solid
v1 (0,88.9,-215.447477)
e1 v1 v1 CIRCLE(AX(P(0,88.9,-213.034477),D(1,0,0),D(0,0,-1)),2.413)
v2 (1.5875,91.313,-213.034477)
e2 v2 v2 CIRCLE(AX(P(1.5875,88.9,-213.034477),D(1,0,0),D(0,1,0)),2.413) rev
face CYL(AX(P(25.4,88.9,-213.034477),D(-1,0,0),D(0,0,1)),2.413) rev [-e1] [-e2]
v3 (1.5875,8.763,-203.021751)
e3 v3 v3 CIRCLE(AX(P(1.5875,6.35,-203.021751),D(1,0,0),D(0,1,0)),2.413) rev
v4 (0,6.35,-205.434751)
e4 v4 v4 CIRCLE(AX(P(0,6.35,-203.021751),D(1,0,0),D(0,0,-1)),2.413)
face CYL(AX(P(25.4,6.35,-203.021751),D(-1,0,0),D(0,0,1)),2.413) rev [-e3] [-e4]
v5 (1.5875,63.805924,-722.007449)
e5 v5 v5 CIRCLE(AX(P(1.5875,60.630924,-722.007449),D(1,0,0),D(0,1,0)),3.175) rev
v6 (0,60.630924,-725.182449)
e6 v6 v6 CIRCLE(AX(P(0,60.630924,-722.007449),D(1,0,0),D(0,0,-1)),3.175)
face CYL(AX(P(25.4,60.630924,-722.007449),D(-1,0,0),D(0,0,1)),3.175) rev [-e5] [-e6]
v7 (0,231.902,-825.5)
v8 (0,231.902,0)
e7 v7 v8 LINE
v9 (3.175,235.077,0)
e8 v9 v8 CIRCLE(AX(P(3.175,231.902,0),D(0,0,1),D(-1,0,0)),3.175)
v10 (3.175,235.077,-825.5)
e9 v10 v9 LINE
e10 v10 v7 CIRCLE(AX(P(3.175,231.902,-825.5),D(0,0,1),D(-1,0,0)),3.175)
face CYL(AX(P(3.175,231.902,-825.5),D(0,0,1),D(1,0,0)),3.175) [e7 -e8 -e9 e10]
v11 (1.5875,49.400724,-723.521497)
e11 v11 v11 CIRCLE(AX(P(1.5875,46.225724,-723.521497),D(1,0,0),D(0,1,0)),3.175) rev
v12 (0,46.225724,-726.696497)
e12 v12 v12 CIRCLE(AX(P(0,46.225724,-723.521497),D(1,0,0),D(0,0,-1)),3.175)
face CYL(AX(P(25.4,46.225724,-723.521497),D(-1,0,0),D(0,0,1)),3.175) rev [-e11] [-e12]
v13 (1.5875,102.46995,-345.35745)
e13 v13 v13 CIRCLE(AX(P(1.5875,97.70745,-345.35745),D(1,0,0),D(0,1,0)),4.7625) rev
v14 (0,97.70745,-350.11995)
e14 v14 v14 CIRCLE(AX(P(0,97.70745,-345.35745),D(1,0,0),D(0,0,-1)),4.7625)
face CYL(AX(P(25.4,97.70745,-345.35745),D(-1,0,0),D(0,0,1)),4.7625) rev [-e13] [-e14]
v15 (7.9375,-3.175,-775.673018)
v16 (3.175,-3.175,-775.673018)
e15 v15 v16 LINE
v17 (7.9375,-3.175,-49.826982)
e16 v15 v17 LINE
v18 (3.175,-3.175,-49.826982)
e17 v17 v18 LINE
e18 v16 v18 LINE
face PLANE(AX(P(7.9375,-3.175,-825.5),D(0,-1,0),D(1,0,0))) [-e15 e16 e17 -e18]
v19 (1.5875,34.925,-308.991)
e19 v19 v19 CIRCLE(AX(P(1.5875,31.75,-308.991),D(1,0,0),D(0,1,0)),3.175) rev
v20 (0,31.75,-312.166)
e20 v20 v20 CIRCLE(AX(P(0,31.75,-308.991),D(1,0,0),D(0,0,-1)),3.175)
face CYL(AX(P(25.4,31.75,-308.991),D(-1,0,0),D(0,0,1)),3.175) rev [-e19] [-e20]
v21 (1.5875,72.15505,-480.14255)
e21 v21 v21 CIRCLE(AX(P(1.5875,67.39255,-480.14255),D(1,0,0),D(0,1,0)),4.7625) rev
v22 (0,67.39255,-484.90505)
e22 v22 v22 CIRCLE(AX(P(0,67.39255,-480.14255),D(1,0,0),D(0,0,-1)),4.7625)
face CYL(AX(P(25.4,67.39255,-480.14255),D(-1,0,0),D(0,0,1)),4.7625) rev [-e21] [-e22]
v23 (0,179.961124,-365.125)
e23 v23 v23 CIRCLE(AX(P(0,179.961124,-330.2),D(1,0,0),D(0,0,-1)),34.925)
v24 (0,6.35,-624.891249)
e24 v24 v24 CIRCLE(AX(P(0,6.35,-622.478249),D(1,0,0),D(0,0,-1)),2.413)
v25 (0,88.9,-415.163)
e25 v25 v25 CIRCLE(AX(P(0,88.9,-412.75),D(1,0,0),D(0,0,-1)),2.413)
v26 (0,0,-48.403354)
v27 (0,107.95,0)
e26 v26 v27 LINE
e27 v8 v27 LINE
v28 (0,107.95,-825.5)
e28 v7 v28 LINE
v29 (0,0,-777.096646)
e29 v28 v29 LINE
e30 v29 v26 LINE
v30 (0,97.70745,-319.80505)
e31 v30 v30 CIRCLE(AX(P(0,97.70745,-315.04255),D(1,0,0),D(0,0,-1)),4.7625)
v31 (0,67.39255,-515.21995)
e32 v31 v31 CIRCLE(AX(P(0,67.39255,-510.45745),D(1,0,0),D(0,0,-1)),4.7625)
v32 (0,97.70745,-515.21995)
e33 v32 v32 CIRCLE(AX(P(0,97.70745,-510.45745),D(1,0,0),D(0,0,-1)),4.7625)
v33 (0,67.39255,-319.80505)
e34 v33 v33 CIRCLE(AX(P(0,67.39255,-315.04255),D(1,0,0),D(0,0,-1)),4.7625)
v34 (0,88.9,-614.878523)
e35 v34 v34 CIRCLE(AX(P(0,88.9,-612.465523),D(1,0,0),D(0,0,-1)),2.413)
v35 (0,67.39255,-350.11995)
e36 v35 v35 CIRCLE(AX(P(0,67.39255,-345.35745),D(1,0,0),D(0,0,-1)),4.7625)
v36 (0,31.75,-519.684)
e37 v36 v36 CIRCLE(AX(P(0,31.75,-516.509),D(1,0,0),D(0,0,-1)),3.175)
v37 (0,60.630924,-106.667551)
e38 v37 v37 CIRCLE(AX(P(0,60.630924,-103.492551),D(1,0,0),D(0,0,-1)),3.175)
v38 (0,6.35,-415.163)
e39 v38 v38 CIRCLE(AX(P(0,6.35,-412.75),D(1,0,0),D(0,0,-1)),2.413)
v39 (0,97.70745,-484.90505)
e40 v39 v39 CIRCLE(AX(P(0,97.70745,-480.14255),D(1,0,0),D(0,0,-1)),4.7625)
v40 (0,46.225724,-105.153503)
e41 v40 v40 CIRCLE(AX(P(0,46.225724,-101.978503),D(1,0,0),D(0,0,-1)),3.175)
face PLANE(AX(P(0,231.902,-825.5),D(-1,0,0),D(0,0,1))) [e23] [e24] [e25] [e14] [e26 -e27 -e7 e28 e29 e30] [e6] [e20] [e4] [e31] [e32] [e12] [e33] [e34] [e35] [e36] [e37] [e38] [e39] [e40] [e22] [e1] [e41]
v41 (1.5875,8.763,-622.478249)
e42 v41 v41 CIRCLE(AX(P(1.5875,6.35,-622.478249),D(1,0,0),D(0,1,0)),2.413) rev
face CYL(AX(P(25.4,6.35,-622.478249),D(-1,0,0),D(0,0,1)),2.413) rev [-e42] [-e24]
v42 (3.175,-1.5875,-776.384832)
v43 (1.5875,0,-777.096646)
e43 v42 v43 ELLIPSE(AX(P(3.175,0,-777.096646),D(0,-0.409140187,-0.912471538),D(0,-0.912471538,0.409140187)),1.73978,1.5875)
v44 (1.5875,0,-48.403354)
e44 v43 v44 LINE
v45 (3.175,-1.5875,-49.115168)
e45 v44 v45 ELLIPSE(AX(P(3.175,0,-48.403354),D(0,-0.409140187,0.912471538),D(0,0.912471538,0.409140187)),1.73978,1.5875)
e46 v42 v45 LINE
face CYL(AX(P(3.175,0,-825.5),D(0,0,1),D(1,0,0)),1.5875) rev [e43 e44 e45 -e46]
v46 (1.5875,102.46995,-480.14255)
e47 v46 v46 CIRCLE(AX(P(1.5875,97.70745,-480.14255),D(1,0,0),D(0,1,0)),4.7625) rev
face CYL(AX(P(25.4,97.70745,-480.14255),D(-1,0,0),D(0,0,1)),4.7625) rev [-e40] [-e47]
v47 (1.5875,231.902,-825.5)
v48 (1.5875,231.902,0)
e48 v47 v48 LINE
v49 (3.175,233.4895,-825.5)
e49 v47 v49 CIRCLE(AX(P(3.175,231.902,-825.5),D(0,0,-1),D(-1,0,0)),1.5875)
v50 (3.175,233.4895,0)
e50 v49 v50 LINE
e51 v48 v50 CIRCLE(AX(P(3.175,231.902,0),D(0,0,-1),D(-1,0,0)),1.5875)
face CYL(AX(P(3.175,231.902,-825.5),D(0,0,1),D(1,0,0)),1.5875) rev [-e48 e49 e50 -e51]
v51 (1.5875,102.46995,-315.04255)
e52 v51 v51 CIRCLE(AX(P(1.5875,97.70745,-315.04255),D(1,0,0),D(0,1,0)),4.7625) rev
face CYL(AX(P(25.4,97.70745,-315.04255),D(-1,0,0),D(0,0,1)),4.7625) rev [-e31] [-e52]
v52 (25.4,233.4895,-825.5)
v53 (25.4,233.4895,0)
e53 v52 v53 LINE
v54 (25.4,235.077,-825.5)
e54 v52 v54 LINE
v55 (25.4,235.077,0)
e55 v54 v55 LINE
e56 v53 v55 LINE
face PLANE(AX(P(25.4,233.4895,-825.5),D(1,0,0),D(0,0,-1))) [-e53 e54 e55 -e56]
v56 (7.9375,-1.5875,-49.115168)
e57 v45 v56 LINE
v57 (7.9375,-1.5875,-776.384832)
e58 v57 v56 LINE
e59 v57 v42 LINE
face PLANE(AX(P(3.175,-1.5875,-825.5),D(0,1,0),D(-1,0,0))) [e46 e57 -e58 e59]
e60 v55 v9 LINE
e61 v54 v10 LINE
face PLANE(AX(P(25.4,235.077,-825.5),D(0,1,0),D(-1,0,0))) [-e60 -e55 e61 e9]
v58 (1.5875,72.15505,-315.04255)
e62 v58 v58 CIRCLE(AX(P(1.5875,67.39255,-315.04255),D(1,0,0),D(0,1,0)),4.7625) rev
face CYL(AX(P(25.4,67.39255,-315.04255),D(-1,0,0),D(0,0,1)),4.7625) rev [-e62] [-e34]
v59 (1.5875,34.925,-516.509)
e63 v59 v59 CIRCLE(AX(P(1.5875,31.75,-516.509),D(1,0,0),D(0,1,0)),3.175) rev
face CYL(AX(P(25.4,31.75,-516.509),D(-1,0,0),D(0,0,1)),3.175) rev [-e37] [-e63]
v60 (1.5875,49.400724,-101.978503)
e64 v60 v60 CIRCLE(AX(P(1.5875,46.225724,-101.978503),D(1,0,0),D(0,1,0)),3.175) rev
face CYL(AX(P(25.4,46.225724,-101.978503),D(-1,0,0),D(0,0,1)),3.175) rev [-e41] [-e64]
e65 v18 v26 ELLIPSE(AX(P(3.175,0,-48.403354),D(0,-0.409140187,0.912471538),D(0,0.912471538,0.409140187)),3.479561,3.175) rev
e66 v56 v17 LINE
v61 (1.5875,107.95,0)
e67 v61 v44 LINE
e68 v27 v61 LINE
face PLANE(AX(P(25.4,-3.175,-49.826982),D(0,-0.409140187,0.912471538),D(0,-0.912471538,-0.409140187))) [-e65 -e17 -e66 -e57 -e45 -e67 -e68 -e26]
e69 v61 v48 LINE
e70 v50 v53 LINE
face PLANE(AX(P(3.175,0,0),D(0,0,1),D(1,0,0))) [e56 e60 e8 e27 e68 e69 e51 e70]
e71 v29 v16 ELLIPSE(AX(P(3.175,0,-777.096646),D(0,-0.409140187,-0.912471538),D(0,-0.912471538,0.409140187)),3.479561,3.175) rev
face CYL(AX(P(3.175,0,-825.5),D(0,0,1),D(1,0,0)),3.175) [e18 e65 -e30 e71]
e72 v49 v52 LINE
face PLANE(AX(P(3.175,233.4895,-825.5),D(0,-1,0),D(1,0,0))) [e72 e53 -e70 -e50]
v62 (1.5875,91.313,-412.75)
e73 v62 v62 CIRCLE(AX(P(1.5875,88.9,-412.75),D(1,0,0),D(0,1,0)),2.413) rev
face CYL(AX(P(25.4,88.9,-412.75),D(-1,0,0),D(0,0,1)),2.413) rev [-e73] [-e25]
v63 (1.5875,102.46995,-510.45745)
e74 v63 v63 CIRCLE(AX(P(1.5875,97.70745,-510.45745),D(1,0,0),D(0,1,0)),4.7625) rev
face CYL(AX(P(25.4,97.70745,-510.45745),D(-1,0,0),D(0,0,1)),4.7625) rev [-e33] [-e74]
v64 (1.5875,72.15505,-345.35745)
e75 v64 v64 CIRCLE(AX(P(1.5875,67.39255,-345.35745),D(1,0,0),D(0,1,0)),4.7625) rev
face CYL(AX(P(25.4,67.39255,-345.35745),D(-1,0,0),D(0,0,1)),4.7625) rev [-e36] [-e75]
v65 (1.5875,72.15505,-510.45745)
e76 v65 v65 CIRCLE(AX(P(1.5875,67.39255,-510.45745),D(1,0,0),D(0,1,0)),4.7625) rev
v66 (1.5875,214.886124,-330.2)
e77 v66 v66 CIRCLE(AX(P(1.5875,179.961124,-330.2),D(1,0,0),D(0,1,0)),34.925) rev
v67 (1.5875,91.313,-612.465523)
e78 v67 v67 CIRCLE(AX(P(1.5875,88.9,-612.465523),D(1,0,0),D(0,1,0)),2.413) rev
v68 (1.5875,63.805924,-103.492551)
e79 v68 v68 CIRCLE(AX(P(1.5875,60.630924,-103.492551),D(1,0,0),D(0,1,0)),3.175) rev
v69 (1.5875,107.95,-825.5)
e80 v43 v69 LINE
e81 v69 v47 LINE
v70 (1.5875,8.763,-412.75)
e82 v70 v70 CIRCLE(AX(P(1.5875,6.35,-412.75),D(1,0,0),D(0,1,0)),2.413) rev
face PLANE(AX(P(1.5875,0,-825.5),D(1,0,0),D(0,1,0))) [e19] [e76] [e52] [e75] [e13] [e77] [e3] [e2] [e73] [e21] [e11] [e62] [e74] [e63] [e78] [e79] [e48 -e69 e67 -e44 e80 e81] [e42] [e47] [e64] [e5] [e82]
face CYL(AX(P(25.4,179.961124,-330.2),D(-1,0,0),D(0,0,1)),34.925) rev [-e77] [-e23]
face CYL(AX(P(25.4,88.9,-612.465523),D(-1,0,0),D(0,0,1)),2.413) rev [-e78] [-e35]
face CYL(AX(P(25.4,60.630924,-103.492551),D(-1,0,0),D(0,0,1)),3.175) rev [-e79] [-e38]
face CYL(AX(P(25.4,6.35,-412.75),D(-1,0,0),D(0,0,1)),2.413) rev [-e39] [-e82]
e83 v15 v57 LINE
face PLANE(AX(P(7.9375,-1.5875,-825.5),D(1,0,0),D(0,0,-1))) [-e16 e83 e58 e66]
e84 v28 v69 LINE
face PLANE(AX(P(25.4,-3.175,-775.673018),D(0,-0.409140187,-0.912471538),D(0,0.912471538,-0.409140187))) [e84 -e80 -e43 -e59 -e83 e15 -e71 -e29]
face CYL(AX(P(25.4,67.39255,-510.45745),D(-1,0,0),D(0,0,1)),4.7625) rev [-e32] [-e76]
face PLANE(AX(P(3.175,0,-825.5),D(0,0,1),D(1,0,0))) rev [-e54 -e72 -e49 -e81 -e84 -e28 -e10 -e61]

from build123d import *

# Parameters (mm, degrees)
BASE_FLANGE2_DEPTH = 825.5
SKETCH1_R          = 3.175
SKETCH1_R_2        = 2.413
SKETCH1_R_3        = 4.7625
SKETCH1_R_4        = 34.925
CUT_EXTRUDE3_DEPTH = 859.694710551


# Sheet-metal steps are written as plain solids
with BuildPart() as part:
    # Sketch3 → Base-Flange2 (new body)
    with BuildSketch(Plane.XY):
        with BuildLine():
            Line((3.175, 233.4895), (25.4, 233.4895))
            Line((25.4, 233.4895), (25.4, 235.077))
            Line((25.4, 235.077), (3.175, 235.077))
            ThreePointArc((3.175, 235.077), (0.92993597, 234.14706403), (0, 231.902))
            Line((0, 231.902), (0, 0))
            ThreePointArc((0, 0), (0.92993597, -2.24506403), (3.175, -3.175))
            Line((3.175, -3.175), (7.9375, -3.175))
            Line((7.9375, -3.175), (7.9375, -1.5875))
            Line((7.9375, -1.5875), (3.175, -1.5875))
            ThreePointArc((3.175, -1.5875), (2.052467985, -1.122532015), (1.5875, 0))
            Line((1.5875, 0), (1.5875, 231.902))
            ThreePointArc((1.5875, 231.902), (2.052467985, 233.024532015), (3.175, 233.4895))
        make_face()
    extrude(amount=-BASE_FLANGE2_DEPTH)

    # Sketch1 → Cut-Extrude3 (cut, through all)
    with BuildSketch(Plane(origin=(0, 0, 0), x_dir=(0, 0, -1), z_dir=(1, 0, 0))):
        with Locations(Location((516.509, 31.75, 0), (0, 0, 90))):
            Circle(SKETCH1_R)
        with Locations(Location((308.991, 31.75, 0), (0, 0, 90))):
            Circle(SKETCH1_R)
        with Locations(Location((103.492550911, 60.630923565, 0), (0, 0, 90))):
            Circle(SKETCH1_R)
        with Locations(Location((722.007449089, 60.630923565, 0), (0, 0, 90))):
            Circle(SKETCH1_R)
        with Locations(Location((412.75, 6.35, 0), (0, 0, 90))):
            Circle(SKETCH1_R_2)
        with Locations(Location((412.75, 88.9, 0), (0, 0, 90))):
            Circle(SKETCH1_R_2)
        with Locations(Location((622.478249316, 6.35, 0), (0, 0, 90))):
            Circle(SKETCH1_R_2)
        with Locations(Location((612.465522577, 88.9, 0), (0, 0, 90))):
            Circle(SKETCH1_R_2)
        with Locations(Location((203.021750684, 6.35, 0), (0, 0, 90))):
            Circle(SKETCH1_R_2)
        with Locations(Location((101.978503418, 46.225723918, 0), (0, 0, 90))):
            Circle(SKETCH1_R)
        with Locations(Location((723.521496582, 46.225723918, 0), (0, 0, 90))):
            Circle(SKETCH1_R)
        with Locations(Location((213.034477423, 88.9, 0), (0, 0, 90))):
            Circle(SKETCH1_R_2)
        with Locations(Location((510.45745, 97.70745, 0), (0, 0, 90))):
            Circle(SKETCH1_R_3)
        with Locations(Location((480.14255, 97.70745, 0), (0, 0, 90))):
            Circle(SKETCH1_R_3)
        with Locations(Location((480.14255, 67.39255, 0), (0, 0, 90))):
            Circle(SKETCH1_R_3)
        with Locations(Location((510.45745, 67.39255, 0), (0, 0, 90))):
            Circle(SKETCH1_R_3)
        with Locations(Location((345.35745, 97.70745, 0), (0, 0, 90))):
            Circle(SKETCH1_R_3)
        with Locations(Location((315.04255, 97.70745, 0), (0, 0, 90))):
            Circle(SKETCH1_R_3)
        with Locations(Location((345.35745, 67.39255, 0), (0, 0, 90))):
            Circle(SKETCH1_R_3)
        with Locations(Location((315.04255, 67.39255, 0), (0, 0, 90))):
            Circle(SKETCH1_R_3)
        with Locations(Location((330.2, 179.961124202, 0), (0, 0, 90))):
            Circle(SKETCH1_R_4)
        Polygon((775.673017562, -3.175), (825.5, 107.95), (825.5, -3.175), align=None)
        Polygon((0, 107.95), (0, -3.175), (49.826982438, -3.175), align=None)
    extrude(amount=CUT_EXTRUDE3_DEPTH, mode=Mode.SUBTRACT)


solid = part.part
